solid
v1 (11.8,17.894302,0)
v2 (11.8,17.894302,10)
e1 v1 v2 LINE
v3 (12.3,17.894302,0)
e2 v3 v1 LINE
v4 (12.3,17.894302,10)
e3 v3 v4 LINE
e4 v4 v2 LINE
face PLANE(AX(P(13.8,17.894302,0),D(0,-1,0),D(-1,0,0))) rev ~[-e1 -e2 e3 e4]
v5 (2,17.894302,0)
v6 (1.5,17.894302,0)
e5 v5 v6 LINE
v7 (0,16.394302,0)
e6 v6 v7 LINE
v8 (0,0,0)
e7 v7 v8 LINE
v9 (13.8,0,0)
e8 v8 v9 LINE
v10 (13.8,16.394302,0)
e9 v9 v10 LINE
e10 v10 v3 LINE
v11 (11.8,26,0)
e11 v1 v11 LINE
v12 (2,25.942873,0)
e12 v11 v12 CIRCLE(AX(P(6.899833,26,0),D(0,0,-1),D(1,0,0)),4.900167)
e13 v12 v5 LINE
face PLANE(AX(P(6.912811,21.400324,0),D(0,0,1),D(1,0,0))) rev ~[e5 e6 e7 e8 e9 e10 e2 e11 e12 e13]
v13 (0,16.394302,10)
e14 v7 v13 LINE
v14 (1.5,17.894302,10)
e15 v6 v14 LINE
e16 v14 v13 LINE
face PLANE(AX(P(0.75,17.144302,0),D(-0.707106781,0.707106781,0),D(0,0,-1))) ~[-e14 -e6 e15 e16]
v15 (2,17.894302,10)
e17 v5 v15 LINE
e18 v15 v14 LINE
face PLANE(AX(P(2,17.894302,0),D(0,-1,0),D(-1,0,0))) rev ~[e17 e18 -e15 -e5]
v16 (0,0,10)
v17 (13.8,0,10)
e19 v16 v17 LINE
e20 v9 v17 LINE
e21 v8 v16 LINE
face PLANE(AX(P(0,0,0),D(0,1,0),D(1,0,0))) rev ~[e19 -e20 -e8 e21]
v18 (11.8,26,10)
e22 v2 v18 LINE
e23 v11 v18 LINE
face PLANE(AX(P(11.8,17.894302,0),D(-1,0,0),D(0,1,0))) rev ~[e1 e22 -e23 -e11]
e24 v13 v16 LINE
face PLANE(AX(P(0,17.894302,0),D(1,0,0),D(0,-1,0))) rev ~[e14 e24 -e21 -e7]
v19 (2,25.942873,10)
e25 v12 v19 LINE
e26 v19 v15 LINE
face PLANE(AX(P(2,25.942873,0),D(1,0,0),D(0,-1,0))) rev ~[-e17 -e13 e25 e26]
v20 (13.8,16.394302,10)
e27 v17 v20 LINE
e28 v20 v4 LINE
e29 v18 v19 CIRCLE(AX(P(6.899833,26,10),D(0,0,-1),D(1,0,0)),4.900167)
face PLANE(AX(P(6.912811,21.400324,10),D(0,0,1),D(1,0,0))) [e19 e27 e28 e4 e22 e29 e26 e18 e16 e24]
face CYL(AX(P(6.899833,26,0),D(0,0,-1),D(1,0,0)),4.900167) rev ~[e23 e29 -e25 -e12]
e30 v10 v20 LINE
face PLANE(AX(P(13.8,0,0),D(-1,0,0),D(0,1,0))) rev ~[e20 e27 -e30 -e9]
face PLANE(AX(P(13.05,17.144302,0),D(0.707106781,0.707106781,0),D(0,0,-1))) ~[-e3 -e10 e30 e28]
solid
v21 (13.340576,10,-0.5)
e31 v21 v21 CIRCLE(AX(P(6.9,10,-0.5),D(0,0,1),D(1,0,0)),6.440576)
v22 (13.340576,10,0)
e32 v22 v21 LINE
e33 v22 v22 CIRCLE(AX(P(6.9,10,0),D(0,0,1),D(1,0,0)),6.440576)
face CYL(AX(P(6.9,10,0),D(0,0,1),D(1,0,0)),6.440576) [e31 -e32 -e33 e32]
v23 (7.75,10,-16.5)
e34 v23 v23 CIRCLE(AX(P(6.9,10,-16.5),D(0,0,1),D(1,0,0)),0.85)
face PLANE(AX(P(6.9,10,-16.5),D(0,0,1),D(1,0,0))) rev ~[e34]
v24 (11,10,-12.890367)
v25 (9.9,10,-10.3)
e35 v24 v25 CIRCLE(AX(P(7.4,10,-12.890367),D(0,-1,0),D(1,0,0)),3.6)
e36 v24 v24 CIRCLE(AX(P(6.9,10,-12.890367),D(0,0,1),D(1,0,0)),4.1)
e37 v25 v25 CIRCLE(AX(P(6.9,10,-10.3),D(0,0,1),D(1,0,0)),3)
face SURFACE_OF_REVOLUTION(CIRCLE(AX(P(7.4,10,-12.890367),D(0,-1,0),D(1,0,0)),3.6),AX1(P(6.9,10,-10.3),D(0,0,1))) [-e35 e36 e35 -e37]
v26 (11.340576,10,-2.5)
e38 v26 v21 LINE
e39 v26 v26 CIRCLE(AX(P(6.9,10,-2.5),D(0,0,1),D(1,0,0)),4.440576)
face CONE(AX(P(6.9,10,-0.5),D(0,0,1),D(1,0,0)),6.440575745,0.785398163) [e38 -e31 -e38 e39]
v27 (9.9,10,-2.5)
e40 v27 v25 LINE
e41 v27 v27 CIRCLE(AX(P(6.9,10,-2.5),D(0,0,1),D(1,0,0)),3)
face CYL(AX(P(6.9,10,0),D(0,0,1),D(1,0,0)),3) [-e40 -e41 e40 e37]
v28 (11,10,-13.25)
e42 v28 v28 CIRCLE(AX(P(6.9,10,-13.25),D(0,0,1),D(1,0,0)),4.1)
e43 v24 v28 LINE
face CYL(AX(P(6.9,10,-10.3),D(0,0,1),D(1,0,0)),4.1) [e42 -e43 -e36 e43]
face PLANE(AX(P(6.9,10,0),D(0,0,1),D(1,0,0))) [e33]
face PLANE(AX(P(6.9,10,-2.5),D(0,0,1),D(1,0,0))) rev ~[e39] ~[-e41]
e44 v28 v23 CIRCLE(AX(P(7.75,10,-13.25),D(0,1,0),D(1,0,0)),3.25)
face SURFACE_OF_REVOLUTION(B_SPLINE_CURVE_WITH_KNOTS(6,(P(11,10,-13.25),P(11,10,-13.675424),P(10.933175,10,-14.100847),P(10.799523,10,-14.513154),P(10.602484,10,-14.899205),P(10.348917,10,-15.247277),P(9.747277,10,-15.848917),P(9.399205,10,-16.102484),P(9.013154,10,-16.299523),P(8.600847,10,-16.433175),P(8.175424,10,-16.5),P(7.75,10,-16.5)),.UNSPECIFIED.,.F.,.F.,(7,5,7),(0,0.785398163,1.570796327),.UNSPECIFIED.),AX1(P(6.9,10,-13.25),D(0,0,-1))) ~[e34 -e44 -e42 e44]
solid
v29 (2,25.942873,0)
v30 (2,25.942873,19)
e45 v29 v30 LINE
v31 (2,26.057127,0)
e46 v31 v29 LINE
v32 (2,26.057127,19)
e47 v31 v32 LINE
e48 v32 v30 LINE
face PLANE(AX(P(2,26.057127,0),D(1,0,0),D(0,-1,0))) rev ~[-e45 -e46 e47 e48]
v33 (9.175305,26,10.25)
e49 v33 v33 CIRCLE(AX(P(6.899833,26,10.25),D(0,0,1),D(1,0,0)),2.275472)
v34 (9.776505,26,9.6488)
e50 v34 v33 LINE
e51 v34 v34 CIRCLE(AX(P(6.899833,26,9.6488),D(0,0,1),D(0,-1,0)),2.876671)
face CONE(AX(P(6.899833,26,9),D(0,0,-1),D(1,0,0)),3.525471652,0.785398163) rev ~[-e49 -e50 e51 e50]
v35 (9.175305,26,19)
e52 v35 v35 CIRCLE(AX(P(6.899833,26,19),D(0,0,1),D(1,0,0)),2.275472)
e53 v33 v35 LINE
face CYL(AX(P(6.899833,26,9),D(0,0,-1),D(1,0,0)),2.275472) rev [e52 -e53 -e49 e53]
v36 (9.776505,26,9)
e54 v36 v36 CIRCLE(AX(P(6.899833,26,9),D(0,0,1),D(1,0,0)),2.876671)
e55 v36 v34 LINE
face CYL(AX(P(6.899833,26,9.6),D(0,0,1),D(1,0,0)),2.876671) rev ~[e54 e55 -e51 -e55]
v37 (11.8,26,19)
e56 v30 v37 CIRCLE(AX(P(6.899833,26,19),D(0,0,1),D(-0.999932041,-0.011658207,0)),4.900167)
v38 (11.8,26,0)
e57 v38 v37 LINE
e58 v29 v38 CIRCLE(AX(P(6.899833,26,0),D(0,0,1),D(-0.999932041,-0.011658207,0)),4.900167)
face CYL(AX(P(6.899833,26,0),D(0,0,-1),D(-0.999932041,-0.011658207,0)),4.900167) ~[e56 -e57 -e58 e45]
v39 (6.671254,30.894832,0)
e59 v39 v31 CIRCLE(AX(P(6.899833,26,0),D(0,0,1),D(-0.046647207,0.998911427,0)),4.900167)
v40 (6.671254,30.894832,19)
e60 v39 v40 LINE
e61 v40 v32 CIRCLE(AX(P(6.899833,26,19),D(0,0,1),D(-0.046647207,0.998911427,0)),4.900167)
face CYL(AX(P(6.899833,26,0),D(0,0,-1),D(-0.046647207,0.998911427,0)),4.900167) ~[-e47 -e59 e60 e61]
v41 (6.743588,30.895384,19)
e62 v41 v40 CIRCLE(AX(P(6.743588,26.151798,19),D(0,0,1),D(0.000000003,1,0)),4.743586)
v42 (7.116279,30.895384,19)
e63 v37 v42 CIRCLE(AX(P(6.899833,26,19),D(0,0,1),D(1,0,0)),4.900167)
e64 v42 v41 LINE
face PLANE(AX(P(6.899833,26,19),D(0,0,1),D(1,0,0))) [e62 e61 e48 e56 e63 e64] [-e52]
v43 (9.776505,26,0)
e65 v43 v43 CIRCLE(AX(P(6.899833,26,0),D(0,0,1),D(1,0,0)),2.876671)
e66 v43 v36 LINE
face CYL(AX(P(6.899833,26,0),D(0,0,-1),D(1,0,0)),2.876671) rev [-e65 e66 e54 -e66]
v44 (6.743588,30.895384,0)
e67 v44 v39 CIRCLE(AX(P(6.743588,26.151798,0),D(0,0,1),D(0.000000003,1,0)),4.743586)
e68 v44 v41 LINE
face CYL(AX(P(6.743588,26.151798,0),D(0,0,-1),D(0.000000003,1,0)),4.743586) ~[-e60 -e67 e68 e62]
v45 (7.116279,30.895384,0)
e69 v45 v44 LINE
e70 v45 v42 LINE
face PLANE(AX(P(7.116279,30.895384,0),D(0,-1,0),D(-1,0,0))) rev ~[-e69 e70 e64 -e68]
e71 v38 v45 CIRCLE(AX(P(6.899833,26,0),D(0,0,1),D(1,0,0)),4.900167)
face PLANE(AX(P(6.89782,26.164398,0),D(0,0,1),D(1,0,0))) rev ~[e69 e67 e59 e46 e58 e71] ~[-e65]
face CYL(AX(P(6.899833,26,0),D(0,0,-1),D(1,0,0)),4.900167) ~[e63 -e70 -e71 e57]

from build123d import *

# Parameters (mm, degrees)
F0_R         = 2.8766712164
F1_DEPTH     = 19
F0_R_2       = 3
F2_DEPTH     = 16.5
F3_START     = -10.3
F0_R_3       = 4.1
F3_DEPTH     = 6.2
F0_R_4       = 6.4405757452
F4_DEPTH     = 2.5
F5_DEPTH     = 10
F6_R         = 3.25
F8_SIZE      = 2
F9_START     = 9
F0_R_5       = 2.2754716525
F9_DEPTH     = 10
F10_S5_R     = 2.8766712164
F10_T6_DEPTH = 7
F11_SIZE     = 1.5


# Not quite as in the source:
# - a fillet or chamfer that OpenCascade refuses, or shapes differently, is made with other operations: its cross-section is extruded or revolved along the edge and cut away or added


with BuildPart() as f1:
    # F0 (on Top) → F1 (new body)
    with BuildSketch(Plane.XY):
        with BuildLine():
            Line((2, 26.0571271565), (2, 25.9428728435))
            ThreePointArc((2, 25.9428728435), (6.9283975578, 21.0999167478), (11.8, 26))
            ThreePointArc((11.8, 26), (10.4404727363, 29.3875515556), (7.1162793435, 30.8953838438))
            Line((7.1162793435, 30.8953838438), (6.7435880271, 30.8953838438))
            ThreePointArc((6.7435880271, 30.8953838438), (6.7074201677, 30.8952459595), (6.6712544109, 30.8948323144))
            ThreePointArc((6.6712544109, 30.8948323144), (3.3747800634, 29.4037670445), (2, 26.0571271565))
        make_face()
        with Locations((6.8998334943, 26)):
            Circle(F0_R, mode=Mode.SUBTRACT)
    extrude(amount=F1_DEPTH)

    # F0 (on Top) → F9 (join)
    with BuildSketch(Plane.XY.offset(F9_START)):
        with Locations((6.8998334943, 26)):
            Circle(F0_R)
        with Locations((6.8998334943, 26)):
            Circle(F0_R_5, mode=Mode.SUBTRACT)
    extrude(amount=F9_DEPTH)

    # F10: chamfer of 1.25 on 1 edges, made by hand


with BuildPart() as f2:
    # F0 (on Top) → F2 (new body)
    with BuildSketch(Plane.XY):
        with Locations((6.9, 10)):
            Circle(F0_R_2)
    extrude(amount=-F2_DEPTH)

    # F0 (on Top) → F3 (join)
    with BuildSketch(Plane.XY.offset(F3_START)):
        with Locations((6.9, 10)):
            Circle(F0_R_3)
        with Locations((6.9, 10)):
            Circle(F0_R_2, mode=Mode.SUBTRACT)
    extrude(amount=-F3_DEPTH)

    # F0 (on Top) → F4 (join)
    with BuildSketch(Plane.XY):
        with Locations((6.9, 10)):
            Circle(F0_R_4)
        with Locations((6.9, 10)):
            Circle(F0_R_3, mode=Mode.SUBTRACT)
        with Locations((6.9, 10)):
            Circle(F0_R_3)
        with Locations((6.9, 10)):
            Circle(F0_R_2, mode=Mode.SUBTRACT)
    extrude(amount=-F4_DEPTH)

    # F6
    f6_edges = [f2.edges().sort_by_distance(p)[0] for p in [
        (2.8, 10, -16.5),
    ]]
    fillet(f6_edges, radius=F6_R)

    # F7: fillet of radius 3.6 on 1 edges, made by hand

    # F7_s1 → F7_t2 (revolve, cut)
    with BuildSketch(Plane.XZ.offset(-10)):
        with BuildLine():
            ThreePointArc((11, -12.8903667694), (10.7136083052, -11.4832420415), (9.9, -10.3))
            Line((9.9, -10.3), (11, -10.3))
            Line((11, -10.3), (11, -12.8903667694))
        make_face()
    revolve(axis=Axis((6.9, 10, -10.3), (0, 0, 1)), mode=Mode.SUBTRACT)

    # F8
    f8_edges = [f2.edges().sort_by_distance(p)[0] for p in [
        (0.459424, 10, -2.5),
    ]]
    chamfer(f8_edges, length=F8_SIZE)


with BuildPart() as f5:
    # F0 (on Top) → F5 (new body)
    with BuildSketch(Plane.XY):
        with BuildLine():
            Line((2, 25.9428728435), (2, 17.8943023658))
            Line((2, 17.8943023658), (11.8, 17.8943023658))
            Line((11.8, 17.8943023658), (11.8, 26))
            ThreePointArc((11.8, 26), (6.9283975578, 21.0999167478), (2, 25.9428728435))
        make_face()
        Polygon((0, 17.8943023658), (0, 0), (13.8, 0), (13.8, 17.8943023658), (11.8, 17.8943023658), (2, 17.8943023658), align=None)
        with Locations((6.9, 10)):
            Circle(F0_R_4, mode=Mode.SUBTRACT)
        with Locations((6.9, 10)):
            Circle(F0_R_4)
        with Locations((6.9, 10)):
            Circle(F0_R_3, mode=Mode.SUBTRACT)
        with Locations((6.9, 10)):
            Circle(F0_R_3)
        with Locations((6.9, 10)):
            Circle(F0_R_2, mode=Mode.SUBTRACT)
        with Locations((6.9, 10)):
            Circle(F0_R_2)
    extrude(amount=F5_DEPTH)

    # F11
    f11_edges = [f5.edges().sort_by_distance(p)[0] for p in [
        (0, 17.894302, 5),
        (13.8, 17.894302, 5),
    ]]
    chamfer(f11_edges, length=F11_SIZE)


with BuildPart() as f10_tool2:
    # F10_s3 → F10_t4 (revolve)
    with BuildSketch(Plane.XZ.offset(-26)):
        Polygon((10.4253051468, 9), (9.1753051468, 10.25), (9.1753051468, 9), align=None)
    revolve(axis=Axis((6.8998334943, 26, 9), (0, 0, 1)))

    # F10_s5 → F10_t6 (intersect, symmetric)
    with BuildSketch(Plane.XY.offset(9.6)):
        with Locations((6.8998334943, 26)):
            Circle(F10_S5_R)
    extrude(amount=F10_T6_DEPTH, both=True, mode=Mode.INTERSECT)


with BuildPart() as f1_1:
    add(f1.part)

    # F10_t1: cut F10_tool2
    add(f10_tool2.part, mode=Mode.SUBTRACT)


solid = Compound([f2.part, f5.part, f1_1.part])
